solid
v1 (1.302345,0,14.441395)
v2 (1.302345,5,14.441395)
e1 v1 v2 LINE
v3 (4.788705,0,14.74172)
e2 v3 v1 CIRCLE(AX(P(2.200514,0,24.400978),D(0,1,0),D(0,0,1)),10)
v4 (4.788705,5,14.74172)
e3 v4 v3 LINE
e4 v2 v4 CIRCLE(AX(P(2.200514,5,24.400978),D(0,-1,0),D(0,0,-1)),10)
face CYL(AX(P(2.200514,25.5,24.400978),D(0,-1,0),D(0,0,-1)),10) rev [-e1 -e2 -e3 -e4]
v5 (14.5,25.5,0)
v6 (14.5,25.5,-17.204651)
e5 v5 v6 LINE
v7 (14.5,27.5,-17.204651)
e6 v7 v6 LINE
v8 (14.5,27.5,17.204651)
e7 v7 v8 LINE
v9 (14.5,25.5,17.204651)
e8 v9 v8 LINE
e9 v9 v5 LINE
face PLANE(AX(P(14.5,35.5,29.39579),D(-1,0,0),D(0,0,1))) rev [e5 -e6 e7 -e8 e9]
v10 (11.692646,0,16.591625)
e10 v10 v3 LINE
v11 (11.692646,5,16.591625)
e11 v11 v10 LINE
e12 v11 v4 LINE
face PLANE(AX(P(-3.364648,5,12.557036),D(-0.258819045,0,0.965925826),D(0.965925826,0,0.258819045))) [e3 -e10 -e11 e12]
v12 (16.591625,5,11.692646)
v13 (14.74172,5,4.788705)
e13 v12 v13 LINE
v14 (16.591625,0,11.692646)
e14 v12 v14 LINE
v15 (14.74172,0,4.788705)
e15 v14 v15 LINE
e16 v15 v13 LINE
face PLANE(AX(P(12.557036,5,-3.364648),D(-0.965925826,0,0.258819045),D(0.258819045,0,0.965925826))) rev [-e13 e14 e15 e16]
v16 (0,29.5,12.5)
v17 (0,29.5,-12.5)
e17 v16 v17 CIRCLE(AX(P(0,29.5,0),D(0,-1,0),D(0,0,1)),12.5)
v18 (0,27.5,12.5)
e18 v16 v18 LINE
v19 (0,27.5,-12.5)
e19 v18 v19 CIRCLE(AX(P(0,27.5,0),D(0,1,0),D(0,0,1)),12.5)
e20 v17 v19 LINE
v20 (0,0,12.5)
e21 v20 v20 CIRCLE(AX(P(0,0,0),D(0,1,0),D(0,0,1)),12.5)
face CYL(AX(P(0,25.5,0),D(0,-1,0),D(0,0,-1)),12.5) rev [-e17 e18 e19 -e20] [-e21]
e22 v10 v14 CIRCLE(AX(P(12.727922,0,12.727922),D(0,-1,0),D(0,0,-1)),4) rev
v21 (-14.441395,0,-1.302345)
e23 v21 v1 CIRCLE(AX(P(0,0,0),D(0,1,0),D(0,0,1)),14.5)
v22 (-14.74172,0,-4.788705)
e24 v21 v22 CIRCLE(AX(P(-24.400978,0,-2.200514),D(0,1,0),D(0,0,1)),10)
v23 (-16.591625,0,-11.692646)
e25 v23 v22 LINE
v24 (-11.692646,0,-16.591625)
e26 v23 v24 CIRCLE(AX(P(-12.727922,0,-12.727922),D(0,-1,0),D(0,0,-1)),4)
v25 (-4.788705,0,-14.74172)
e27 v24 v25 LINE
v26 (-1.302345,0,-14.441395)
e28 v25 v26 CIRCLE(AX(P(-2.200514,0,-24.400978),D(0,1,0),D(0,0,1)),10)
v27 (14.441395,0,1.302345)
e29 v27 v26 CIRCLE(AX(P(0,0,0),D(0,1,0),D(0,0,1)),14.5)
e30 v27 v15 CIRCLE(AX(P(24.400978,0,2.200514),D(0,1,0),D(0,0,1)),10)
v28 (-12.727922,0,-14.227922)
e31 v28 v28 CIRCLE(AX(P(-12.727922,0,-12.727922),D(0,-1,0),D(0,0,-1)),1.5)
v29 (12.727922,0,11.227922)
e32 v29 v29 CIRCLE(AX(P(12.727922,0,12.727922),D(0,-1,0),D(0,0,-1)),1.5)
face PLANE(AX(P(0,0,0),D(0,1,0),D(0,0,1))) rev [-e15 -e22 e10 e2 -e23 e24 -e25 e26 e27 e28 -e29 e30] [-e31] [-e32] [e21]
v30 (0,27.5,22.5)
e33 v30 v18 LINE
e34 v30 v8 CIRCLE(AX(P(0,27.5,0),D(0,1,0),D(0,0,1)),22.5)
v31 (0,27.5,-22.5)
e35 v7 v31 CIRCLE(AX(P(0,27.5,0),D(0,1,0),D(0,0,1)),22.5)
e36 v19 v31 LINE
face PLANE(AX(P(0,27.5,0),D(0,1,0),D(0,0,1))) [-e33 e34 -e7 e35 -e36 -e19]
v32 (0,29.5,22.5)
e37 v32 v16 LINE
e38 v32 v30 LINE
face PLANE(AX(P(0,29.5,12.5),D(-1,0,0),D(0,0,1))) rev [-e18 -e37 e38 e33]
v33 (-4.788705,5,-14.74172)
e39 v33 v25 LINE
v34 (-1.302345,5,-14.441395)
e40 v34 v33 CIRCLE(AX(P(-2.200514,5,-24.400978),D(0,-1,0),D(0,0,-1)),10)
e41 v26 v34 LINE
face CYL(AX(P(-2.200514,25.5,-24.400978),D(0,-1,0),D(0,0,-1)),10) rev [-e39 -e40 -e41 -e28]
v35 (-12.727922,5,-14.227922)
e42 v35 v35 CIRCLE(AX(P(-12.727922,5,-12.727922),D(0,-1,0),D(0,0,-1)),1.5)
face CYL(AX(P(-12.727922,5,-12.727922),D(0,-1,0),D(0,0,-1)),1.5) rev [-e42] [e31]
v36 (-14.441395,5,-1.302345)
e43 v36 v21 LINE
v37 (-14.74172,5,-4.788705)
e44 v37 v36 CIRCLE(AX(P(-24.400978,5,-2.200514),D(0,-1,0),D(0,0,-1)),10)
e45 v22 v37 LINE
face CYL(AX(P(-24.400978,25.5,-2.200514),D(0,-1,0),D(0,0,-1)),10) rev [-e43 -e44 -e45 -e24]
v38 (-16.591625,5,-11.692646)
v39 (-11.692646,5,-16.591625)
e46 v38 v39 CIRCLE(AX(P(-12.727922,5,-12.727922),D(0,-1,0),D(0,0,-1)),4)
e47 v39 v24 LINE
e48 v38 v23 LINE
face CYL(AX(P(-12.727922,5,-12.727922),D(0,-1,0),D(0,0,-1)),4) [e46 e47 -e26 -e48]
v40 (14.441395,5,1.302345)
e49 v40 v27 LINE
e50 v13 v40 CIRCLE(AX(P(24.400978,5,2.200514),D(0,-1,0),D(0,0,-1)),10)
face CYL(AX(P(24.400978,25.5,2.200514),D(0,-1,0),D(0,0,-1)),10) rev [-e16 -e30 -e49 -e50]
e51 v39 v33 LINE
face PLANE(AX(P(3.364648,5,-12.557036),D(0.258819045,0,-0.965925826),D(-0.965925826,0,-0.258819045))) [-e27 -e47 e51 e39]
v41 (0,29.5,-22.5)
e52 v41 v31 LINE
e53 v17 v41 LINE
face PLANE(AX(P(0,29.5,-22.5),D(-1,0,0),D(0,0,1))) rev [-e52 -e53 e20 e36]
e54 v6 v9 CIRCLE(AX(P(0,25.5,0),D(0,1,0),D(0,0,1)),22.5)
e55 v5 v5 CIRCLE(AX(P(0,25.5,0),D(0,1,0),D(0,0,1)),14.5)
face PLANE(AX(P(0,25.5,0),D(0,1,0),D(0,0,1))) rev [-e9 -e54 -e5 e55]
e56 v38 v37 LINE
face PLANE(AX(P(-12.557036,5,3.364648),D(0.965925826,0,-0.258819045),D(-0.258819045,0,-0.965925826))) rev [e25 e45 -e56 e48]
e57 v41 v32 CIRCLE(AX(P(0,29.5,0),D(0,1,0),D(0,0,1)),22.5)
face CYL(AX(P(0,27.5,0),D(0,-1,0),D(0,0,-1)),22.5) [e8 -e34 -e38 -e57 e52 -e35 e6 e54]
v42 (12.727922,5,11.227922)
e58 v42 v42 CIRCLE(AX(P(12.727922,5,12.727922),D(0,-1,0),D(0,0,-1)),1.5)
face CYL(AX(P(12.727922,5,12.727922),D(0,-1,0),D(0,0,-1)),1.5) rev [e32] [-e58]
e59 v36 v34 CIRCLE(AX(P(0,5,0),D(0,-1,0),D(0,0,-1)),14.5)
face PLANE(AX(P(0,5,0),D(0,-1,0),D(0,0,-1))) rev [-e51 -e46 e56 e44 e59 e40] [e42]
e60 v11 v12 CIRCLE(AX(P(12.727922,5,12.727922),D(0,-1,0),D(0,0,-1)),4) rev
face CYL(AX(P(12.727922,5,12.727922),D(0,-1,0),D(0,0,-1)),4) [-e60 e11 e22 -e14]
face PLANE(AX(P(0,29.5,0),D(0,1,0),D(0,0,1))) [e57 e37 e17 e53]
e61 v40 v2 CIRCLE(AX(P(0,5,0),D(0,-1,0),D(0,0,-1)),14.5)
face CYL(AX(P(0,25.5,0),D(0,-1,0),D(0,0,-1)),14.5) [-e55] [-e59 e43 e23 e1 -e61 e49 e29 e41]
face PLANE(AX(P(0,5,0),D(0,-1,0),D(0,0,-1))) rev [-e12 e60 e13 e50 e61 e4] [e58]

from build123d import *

# Parameters (mm, degrees)
SKETCH_2_R          = 14.5
SKETCH_2_R_2        = 12.5
EXTRUDE_1_DEPTH     = 25.5
SKETCH_3_R          = 22.5
SKETCH_3_R_2        = 12.5
EXTRUDE_2_DEPTH     = 2
EXTRUDE_3_DEPTH     = 2
CUT_EXTRUDE_1_DEPTH = 10
SKETCH_7_R          = 1.500000000000006
SKETCH_7_R_2        = 14.5
SKETCH_7_R_3        = 12.5
SKETCH_7_R_4        = 1.499999999999986
EXTRUDE_4_DEPTH     = 5
FILLET_1_R          = 10


with BuildPart() as part:
    # 草圖2 → 填料-伸長1 (new body)
    with BuildSketch(Plane(origin=(0, 0, 0), x_dir=(1, 0, 0), z_dir=(0, 1, 0))):
        with Locations(Location((0, 0, 0), (0, 0, 270))):
            Circle(SKETCH_2_R)
        with Locations(Location((0, 0, 0), (0, 0, 270))):
            Circle(SKETCH_2_R_2, mode=Mode.SUBTRACT)
    extrude(amount=EXTRUDE_1_DEPTH)

    # 草圖3 → 填料-伸長2 (add)
    with BuildSketch(Plane(origin=(0, 25.5, 0), x_dir=(1, 0, 0), z_dir=(0, 1, 0))):
        with Locations(Location((0, 0, 0), (0, 0, 270))):
            Circle(SKETCH_3_R)
        with Locations(Location((0, 0, 0), (0, 0, 270))):
            Circle(SKETCH_3_R_2, mode=Mode.SUBTRACT)
    extrude(amount=EXTRUDE_2_DEPTH)

    # 草圖4 → 填料-伸長3 (add)
    with BuildSketch(Plane(origin=(0, 27.499999999999996, 0), x_dir=(1, 0, 0), z_dir=(0, 1, 0))):
        with BuildLine():
            Line((0, 22.500000000000004), (4.29e-15, 12.5))
            ThreePointArc((4.29e-15, 12.5), (-12.5, 1.53e-15), (4.29e-15, -12.5))
            Line((4.29e-15, -12.5), (0, -22.500000000000004))
            ThreePointArc((0, -22.500000000000004), (-22.500000000000004, 2.76e-15), (0, 22.500000000000004))
        make_face()
    extrude(amount=EXTRUDE_3_DEPTH)

    # 草圖6 → 除料-伸長1 (cut)
    with BuildSketch(Plane.XZ.offset(-25.5)):
        Polygon((14.499999999999996, 29.395789513712703), (53.33899904059902, 29.395789513712703), (53.33899904059903, -31.21012107711215), (14.500000000000004, -31.21012107711215), align=None)
    extrude(amount=-CUT_EXTRUDE_1_DEPTH, mode=Mode.SUBTRACT)

    # 草圖7 → 填料-伸長4 (add)
    # profile 1 of 3: a face of its own
    with BuildSketch(Plane.XZ):
        with BuildLine():
            ThreePointArc((-16.59162536651419, -11.692645880947747), (-15.556349186104121, -15.556349186104029), (-11.692645880947847, -16.591625366514123))
            Line((-11.692645880947847, -16.591625366514123), (-2.839123359878414, -14.21933115682284))
            ThreePointArc((-2.8391233598784202, -14.219331156822836), (-10.253048327204969, -10.25304832720491), (-14.219331156822854, -2.8391233598783336))
            Line((-14.219331156822806, -2.8391233598783234), (-16.59162536651419, -11.692645880947747))
        make_face()
        with Locations(Location((-12.727922061357921, -12.72792206135785, 0), (0, 0, 270))):
            Circle(SKETCH_7_R, mode=Mode.SUBTRACT)
    # profile 2 of 3: a face of its own
    with BuildSketch(Plane.XZ):
        with Locations(Location((0, 0, 0), (0, 0, 258.708444725))):
            Circle(SKETCH_7_R_2)
        with Locations(Location((0, 0, 0), (0, 0, 90))):
            Circle(SKETCH_7_R_3, mode=Mode.SUBTRACT)
    # profile 3 of 3: a face of its own
    with BuildSketch(Plane.XZ):
        with BuildLine():
            Line((11.692645880947822, 16.591625366514), (2.839123359878405, 14.21933115682271))
            ThreePointArc((2.8391233598784344, 14.219331156822834), (10.253048327205017, 10.25304832720486), (14.219331156822877, 2.8391233598782186))
            Line((14.219331156822797, 2.8391233598782026), (16.591625366514172, 11.692645880947598))
            ThreePointArc((16.591625366514172, 11.692645880947598), (15.556349186104118, 15.556349186103905), (11.692645880947822, 16.591625366514))
        make_face()
        with Locations(Location((12.727922061357914, 12.72792206135772, 0), (0, 0, 270))):
            Circle(SKETCH_7_R_4, mode=Mode.SUBTRACT)
    extrude(amount=-EXTRUDE_4_DEPTH)

    # 圓角1
    # the kernel refuses this fillet: 10 mm, written as the material it adds along each edge
    with BuildSketch(Plane(origin=(-14.21933115682283, 0, -2.8391233598783296), x_dir=(-0.14301440720376446, 0, 0.9897206067027986), z_dir=(0, 1, 0))) as fillet_1_piece_1:
        with BuildLine():
            CenterArc((2.0881667201812895, -9.98565558877935), FILLET_1_R, 93.06924050881132, 20.153074257108685)
            Line((-1.8548317977652202, -0.7958371636160083), (0, 0))
            ThreePointArc((0, 0), (0.7763696780160548, -0.02079939626993994), (1.5527393560321237, -3e-17))
        make_face()
    extrude(amount=5)
    with BuildSketch(Plane(origin=(2.83912335987842, 0, 14.219331156822772), x_dir=(-0.9897206067027934, 0, 0.1430144072038011), z_dir=(0, 1, 0))) as fillet_1_piece_2:
        with BuildLine():
            CenterArc((2.0881667201813614, 9.98565558877934), FILLET_1_R, 246.7776852340785, 20.153074257108983)
            Line((-1.854831797765394, 0.7958371636161028), (0, 0))
            ThreePointArc((0, 0), (0.7763696780159942, 0.02079939626995778), (1.552739356031987, -2e-17))
        make_face()
    extrude(amount=5)
    with BuildSketch(Plane(origin=(14.219331156822836, 0, 2.839123359878211), x_dir=(0.14301440720376882, 0, -0.989720606702798), z_dir=(0, 1, 0))) as fillet_1_piece_3:
        with BuildLine():
            CenterArc((2.088166720181273, -9.985655588779348), FILLET_1_R, 93.06924050881172, 20.1530742571085)
            Line((-1.8548317977652724, -0.795837163616021), (0, 0))
            ThreePointArc((0, 0), (0.7763696780160197, -0.02079939626995059), (1.5527393560320395, 2e-17))
        make_face()
    extrude(amount=5)
    with BuildSketch(Plane(origin=(-2.8391233598784176, 0, -14.21933115682284), x_dir=(0.9897206067028005, 0, -0.1430144072037512), z_dir=(0, 1, 0))) as fillet_1_piece_4:
        with BuildLine():
            CenterArc((2.088166720181194, 9.985655588779359), FILLET_1_R, 246.7776852340814, 20.153074257108187)
            Line((-1.8548317977650892, 0.7958371636159217), (0, 0))
            ThreePointArc((0, 0), (0.7763696780160907, 0.02079939626993076), (1.552739356032181, -2e-17))
        make_face()
    extrude(amount=5)


solid = part.part
